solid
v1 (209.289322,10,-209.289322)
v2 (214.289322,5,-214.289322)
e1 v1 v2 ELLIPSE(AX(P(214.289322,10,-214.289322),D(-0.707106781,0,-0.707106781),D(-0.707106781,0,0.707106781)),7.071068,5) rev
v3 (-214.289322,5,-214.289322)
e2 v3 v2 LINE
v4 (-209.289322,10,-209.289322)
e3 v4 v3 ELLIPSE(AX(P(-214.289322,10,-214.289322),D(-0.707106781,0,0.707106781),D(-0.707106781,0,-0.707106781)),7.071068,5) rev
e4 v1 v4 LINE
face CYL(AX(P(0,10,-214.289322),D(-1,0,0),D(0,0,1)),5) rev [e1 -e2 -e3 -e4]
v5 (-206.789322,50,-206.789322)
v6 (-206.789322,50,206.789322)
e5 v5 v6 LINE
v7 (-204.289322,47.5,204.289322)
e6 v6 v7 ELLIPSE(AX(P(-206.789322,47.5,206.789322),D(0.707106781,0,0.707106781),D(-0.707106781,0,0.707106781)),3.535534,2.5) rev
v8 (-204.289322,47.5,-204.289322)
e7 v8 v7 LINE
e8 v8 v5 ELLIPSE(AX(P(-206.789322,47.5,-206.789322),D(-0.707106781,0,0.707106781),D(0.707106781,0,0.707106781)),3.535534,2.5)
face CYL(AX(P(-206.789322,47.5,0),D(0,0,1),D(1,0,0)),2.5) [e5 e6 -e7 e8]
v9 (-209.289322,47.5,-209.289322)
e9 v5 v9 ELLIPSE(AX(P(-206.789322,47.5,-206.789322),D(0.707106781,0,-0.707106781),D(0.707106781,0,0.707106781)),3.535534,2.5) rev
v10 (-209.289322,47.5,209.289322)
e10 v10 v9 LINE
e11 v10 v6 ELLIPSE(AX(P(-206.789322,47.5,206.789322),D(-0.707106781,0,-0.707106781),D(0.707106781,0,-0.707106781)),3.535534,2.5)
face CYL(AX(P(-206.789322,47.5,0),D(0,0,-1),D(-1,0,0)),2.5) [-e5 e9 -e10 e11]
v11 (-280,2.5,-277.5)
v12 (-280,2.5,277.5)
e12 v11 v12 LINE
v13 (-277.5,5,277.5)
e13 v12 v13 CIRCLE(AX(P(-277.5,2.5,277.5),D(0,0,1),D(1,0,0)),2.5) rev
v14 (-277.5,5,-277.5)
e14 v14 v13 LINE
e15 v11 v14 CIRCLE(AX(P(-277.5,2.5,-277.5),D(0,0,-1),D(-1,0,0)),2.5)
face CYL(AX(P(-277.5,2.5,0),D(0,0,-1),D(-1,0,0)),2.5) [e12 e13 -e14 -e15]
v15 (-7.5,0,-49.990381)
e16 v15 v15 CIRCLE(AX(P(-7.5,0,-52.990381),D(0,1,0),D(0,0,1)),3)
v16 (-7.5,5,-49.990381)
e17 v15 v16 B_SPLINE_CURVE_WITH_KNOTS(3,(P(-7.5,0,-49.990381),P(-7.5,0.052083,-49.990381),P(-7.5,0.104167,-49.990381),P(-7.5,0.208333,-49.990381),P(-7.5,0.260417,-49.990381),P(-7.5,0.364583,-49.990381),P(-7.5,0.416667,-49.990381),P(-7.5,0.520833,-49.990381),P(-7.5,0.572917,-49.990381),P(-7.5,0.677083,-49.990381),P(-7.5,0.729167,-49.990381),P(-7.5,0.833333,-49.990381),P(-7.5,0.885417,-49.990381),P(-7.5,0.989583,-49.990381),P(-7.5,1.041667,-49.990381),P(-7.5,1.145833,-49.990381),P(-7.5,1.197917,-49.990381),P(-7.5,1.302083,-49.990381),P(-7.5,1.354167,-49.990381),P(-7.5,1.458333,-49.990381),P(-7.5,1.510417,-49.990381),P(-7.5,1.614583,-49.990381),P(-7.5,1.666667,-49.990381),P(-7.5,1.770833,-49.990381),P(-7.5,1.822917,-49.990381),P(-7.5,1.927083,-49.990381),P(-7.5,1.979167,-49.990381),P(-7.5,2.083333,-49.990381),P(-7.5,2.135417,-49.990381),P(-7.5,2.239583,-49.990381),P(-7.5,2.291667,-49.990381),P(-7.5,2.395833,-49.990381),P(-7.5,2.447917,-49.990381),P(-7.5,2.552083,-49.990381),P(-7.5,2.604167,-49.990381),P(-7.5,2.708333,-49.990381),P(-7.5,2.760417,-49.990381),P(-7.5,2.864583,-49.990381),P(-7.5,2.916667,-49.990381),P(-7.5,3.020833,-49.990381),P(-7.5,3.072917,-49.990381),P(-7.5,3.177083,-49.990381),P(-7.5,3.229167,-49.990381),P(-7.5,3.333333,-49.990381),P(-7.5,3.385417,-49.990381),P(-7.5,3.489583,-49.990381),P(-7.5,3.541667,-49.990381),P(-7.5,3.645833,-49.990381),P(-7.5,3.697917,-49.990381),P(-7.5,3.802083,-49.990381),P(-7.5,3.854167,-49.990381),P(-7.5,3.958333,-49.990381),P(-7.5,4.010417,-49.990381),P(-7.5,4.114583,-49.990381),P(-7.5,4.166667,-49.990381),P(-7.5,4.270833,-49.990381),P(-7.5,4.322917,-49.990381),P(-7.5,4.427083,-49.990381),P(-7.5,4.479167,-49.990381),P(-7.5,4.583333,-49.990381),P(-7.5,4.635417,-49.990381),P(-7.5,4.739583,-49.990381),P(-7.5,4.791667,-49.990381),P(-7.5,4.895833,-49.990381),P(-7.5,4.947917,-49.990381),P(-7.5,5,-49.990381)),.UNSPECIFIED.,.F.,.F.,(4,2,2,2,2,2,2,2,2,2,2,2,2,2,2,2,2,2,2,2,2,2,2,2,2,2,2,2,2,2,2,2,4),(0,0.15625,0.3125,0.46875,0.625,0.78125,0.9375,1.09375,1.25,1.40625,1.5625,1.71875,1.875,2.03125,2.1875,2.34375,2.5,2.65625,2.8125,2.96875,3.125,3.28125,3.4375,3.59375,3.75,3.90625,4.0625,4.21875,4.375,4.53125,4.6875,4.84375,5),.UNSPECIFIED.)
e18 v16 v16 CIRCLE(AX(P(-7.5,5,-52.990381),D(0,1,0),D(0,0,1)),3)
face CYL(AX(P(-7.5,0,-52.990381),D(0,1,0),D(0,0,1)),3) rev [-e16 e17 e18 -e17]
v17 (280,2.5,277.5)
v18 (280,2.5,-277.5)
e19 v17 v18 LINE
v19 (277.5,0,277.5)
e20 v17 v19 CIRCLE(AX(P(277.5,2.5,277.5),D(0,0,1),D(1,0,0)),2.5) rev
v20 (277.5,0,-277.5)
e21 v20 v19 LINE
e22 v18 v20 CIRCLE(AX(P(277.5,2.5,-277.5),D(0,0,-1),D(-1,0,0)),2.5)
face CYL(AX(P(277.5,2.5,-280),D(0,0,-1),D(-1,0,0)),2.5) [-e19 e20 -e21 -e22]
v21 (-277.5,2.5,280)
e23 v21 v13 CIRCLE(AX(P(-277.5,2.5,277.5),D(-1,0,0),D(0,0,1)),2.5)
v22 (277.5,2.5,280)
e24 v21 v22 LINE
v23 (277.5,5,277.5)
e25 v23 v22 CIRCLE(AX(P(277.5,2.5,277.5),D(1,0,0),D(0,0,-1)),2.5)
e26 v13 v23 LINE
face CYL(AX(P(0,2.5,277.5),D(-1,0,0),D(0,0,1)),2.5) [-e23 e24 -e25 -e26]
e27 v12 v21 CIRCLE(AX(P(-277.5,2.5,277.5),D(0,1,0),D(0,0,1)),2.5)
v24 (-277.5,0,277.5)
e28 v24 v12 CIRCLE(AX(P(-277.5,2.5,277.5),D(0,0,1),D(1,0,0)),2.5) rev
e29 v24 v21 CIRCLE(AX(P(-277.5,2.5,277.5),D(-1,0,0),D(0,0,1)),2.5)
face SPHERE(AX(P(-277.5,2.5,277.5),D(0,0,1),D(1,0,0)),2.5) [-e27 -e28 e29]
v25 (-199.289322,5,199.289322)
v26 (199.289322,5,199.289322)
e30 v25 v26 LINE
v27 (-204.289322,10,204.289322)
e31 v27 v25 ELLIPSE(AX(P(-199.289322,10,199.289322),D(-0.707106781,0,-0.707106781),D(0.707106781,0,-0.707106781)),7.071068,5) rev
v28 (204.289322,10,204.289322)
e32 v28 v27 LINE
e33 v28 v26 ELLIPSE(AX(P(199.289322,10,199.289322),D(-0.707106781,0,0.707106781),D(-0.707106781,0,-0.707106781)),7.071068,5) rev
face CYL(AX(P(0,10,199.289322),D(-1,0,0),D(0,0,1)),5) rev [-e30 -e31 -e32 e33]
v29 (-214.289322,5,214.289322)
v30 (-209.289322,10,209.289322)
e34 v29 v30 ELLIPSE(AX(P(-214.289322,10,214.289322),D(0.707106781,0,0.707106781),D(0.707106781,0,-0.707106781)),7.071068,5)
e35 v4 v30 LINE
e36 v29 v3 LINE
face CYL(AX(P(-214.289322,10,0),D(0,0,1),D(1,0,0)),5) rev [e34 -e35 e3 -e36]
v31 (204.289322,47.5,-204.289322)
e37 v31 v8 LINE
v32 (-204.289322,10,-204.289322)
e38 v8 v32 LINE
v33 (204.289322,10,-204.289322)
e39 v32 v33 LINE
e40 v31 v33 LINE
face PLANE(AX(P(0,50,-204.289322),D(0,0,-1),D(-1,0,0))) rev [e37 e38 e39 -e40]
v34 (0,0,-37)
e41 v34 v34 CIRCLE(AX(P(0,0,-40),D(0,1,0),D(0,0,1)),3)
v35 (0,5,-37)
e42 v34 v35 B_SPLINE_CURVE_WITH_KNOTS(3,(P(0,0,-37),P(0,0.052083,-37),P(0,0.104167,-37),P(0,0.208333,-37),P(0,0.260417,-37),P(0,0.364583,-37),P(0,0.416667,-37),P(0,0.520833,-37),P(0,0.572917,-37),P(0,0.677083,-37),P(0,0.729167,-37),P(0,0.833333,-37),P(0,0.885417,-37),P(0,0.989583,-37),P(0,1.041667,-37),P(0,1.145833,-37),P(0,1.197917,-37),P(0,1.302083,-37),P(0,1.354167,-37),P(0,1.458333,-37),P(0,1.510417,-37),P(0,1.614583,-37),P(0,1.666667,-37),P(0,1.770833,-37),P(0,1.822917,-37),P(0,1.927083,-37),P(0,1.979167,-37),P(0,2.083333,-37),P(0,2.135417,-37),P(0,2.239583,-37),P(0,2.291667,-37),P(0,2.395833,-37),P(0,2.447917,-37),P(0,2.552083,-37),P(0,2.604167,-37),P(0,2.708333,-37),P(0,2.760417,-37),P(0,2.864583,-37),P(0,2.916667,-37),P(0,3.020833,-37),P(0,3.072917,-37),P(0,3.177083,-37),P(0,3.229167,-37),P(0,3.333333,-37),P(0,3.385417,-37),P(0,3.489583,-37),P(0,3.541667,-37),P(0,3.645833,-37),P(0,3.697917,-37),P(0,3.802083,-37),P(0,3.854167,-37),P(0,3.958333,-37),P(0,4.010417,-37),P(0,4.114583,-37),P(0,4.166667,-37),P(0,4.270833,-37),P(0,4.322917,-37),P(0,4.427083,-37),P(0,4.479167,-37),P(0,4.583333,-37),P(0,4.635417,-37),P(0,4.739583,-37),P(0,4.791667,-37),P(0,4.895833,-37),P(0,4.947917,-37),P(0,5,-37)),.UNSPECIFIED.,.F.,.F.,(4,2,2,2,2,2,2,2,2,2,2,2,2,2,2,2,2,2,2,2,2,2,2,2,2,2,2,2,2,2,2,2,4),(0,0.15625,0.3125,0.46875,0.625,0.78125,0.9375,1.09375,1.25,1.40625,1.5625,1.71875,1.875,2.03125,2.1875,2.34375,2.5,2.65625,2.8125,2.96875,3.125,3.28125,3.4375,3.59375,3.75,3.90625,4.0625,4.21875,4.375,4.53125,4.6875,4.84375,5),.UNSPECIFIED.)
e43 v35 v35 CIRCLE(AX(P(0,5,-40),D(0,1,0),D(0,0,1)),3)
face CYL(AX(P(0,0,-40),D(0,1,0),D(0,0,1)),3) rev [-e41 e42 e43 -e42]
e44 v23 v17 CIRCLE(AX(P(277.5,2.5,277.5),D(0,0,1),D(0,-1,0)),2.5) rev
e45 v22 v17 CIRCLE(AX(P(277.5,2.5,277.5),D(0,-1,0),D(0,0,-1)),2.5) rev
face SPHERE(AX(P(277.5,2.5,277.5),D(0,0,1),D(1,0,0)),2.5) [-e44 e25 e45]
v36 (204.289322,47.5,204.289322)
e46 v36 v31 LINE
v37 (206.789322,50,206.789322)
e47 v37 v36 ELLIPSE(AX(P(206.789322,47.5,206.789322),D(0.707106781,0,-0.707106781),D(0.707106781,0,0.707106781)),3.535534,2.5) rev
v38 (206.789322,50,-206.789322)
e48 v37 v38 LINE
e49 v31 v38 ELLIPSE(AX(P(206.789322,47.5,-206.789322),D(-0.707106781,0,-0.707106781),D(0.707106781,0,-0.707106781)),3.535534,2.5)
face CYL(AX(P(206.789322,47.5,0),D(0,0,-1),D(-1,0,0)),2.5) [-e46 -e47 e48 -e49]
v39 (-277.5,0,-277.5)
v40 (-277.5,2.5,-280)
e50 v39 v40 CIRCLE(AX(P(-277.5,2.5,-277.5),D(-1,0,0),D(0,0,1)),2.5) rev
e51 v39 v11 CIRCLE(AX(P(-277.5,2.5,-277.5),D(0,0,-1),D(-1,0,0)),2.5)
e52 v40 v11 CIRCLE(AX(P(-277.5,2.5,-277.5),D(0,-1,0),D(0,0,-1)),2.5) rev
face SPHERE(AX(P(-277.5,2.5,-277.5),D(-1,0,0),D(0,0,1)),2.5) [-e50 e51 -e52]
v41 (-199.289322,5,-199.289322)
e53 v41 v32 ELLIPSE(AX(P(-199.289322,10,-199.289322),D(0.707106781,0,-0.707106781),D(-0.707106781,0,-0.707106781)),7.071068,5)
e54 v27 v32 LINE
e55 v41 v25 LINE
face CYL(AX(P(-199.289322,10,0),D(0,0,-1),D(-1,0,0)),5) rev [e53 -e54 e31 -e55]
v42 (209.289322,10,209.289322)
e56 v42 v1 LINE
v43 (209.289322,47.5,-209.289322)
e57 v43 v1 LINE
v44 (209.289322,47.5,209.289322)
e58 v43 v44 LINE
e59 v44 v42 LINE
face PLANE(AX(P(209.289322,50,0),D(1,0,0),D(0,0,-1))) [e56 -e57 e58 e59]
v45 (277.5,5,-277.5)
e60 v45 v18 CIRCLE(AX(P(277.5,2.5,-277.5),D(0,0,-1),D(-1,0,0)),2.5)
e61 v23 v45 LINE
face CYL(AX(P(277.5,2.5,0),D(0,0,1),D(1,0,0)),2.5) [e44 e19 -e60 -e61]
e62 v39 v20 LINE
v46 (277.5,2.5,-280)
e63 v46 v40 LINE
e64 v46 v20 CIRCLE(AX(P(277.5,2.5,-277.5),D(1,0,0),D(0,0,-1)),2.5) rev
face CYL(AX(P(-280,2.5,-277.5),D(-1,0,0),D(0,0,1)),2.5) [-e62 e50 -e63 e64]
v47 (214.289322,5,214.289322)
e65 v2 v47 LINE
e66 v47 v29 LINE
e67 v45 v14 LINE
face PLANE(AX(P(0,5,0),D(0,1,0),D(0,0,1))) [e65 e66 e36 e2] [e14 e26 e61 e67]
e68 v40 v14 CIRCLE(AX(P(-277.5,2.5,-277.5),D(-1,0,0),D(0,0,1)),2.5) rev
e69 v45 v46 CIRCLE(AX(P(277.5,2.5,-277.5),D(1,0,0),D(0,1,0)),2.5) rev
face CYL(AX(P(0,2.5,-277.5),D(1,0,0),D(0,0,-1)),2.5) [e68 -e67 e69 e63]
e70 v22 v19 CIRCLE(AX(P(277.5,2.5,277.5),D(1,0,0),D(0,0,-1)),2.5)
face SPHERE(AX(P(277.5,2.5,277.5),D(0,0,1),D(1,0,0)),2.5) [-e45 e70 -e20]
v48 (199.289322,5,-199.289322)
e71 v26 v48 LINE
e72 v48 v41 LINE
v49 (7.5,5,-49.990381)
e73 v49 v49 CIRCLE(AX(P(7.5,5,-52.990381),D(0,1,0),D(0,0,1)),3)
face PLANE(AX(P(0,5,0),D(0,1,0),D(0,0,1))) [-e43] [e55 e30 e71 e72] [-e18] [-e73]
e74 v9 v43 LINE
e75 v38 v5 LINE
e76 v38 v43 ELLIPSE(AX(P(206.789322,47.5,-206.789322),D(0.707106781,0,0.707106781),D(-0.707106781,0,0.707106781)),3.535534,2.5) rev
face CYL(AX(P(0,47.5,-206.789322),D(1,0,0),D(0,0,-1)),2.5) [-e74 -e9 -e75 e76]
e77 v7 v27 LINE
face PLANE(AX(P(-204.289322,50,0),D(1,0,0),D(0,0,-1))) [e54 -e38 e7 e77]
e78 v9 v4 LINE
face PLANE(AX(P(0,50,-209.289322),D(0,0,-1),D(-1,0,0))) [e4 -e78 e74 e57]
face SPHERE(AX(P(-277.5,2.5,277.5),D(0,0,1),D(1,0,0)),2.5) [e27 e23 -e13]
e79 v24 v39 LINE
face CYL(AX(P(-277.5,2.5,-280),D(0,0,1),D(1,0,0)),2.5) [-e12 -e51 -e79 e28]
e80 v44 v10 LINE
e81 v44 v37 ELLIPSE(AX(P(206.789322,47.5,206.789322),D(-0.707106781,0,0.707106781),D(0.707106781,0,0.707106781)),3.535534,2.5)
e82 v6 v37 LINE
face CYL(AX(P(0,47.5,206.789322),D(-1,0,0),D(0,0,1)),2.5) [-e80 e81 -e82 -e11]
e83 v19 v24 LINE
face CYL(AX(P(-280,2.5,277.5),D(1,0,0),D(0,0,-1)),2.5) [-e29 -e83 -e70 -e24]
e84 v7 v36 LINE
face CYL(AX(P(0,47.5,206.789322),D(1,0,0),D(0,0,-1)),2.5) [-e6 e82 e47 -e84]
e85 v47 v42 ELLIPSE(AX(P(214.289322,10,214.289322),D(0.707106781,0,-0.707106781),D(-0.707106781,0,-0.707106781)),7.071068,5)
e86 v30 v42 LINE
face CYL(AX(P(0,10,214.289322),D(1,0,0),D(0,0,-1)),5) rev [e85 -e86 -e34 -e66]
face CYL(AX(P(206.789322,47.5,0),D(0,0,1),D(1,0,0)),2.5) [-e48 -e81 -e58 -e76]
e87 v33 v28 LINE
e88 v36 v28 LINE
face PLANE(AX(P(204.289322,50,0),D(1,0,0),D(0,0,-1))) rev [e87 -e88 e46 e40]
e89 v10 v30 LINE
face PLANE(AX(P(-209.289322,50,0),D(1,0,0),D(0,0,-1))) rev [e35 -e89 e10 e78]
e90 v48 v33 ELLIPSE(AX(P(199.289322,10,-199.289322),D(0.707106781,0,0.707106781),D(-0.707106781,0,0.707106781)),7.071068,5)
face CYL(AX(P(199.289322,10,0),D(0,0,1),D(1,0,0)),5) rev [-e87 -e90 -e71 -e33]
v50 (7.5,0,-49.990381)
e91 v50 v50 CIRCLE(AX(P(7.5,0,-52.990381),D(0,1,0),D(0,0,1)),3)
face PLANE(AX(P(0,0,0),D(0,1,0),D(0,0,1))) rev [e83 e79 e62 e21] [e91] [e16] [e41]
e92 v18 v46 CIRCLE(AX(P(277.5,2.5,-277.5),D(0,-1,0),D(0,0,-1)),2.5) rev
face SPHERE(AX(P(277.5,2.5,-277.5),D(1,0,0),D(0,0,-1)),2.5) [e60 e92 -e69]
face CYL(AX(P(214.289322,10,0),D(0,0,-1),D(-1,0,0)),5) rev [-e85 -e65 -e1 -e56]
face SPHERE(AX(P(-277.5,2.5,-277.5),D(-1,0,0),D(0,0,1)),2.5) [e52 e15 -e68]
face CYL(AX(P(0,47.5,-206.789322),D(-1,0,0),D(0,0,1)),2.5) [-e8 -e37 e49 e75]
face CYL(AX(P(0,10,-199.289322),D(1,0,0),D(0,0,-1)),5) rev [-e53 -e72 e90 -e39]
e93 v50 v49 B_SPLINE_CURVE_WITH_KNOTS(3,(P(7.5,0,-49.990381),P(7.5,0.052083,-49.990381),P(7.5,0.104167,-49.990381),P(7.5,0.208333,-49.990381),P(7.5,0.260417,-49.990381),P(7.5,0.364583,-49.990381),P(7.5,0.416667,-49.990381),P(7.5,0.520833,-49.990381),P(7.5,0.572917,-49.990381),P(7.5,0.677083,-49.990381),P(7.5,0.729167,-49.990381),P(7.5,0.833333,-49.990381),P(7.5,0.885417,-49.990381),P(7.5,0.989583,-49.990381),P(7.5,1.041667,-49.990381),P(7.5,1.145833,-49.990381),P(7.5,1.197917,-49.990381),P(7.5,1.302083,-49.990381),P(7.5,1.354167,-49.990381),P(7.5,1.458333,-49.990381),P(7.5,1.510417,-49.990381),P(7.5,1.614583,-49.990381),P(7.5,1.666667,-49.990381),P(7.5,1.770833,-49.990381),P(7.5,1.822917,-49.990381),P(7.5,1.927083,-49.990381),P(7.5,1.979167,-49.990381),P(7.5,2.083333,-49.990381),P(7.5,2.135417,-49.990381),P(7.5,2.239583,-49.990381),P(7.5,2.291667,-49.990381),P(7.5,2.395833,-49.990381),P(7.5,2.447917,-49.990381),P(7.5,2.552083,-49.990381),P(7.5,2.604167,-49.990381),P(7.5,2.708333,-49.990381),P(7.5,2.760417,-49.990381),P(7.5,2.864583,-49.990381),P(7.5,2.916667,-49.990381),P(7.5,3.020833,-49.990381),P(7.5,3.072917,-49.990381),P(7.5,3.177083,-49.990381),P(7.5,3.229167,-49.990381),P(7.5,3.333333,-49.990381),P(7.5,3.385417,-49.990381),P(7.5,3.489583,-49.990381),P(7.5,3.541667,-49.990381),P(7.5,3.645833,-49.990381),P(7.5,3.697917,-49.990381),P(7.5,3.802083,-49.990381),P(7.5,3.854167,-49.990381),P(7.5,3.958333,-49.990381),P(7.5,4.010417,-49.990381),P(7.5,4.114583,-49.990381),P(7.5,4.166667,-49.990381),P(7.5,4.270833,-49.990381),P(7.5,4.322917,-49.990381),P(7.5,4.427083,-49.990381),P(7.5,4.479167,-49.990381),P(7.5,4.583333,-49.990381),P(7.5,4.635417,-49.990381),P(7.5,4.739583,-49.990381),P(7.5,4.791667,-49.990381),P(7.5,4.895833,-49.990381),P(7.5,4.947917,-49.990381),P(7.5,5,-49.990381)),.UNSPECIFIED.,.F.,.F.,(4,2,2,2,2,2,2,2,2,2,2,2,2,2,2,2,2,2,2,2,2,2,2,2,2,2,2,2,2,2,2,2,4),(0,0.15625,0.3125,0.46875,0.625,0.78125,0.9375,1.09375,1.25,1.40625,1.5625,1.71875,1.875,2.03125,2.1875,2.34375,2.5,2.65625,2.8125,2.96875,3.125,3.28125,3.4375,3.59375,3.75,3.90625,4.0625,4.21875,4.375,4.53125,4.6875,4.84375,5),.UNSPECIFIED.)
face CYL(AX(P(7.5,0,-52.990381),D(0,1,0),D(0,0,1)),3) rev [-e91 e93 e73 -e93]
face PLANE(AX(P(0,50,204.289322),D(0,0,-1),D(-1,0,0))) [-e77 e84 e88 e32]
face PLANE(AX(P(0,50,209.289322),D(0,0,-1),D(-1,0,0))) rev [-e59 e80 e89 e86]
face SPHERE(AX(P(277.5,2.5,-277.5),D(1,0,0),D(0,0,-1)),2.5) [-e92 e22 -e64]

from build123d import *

# Parameters (mm, degrees)
SKETCH1_W           = 560
SKETCH1_H           = 560
BOSS_EXTRUDE1_DEPTH = 5
SKETCH2_W           = 418.578643762
SKETCH2_H           = 418.578643762
SKETCH2_W_2         = 408.578643762
SKETCH2_H_2         = 408.578643762
BOSS_EXTRUDE2_DEPTH = 45
SKETCH3_R           = 3
CUT_EXTRUDE1_DEPTH  = 5
FILLET1_R           = 5
FILLET2_R           = 2.5
FILLET3_R           = 2.5


with BuildPart() as part:
    # Sketch1 → Boss-Extrude1 (new body)
    with BuildSketch(Plane(origin=(0, 0, 0), x_dir=(1, 0, 0), z_dir=(0, 1, 0))):
        Rectangle(SKETCH1_W, SKETCH1_H)
    extrude(amount=BOSS_EXTRUDE1_DEPTH)

    # Sketch2 → Boss-Extrude2 (add)
    with BuildSketch(Plane(origin=(0, 5, 0), x_dir=(1, 0, 0), z_dir=(0, 1, 0))):
        Rectangle(SKETCH2_W, SKETCH2_H)
        Rectangle(SKETCH2_W_2, SKETCH2_H_2, mode=Mode.SUBTRACT)
    extrude(amount=BOSS_EXTRUDE2_DEPTH)

    # Sketch3 → Cut-Extrude1 (cut)
    with BuildSketch(Plane(origin=(0, 5, 0), x_dir=(1, 0, 0), z_dir=(0, 1, 0))):
        with Locations(Location((7.5, 52.990381057, 0), (0, 0, 270))):
            Circle(SKETCH3_R)
        with Locations(Location((0, 40, 0), (0, 0, 270))):
            Circle(SKETCH3_R)
        with Locations(Location((-7.5, 52.990381057, 0), (0, 0, 270))):
            Circle(SKETCH3_R)
    extrude(amount=-CUT_EXTRUDE1_DEPTH, mode=Mode.SUBTRACT)

    # Fillet1
    fillet1_edges = [part.edges().sort_by_distance(p)[0] for p in [
        (0, 5, -204.289321881),
        (204.289321881, 5, 0),
        (-209.289321881, 5, 0),
        (0, 5, 209.289321881),
        (209.289321881, 5, 0),
        (0, 5, -209.289321881),
        (-204.289321881, 5, 0),
        (0, 5, 204.289321881),
    ]]
    fillet(fillet1_edges, radius=FILLET1_R)

    # Fillet2
    fillet2_edges = [part.edges().sort_by_distance(p)[0] for p in [
        (0, 50, 204.289321881),
        (209.289321881, 50, 0),
        (0, 50, -209.289321881),
        (-204.289321881, 50, 0),
        (-209.289321881, 50, 0),
        (0, 50, 209.289321881),
        (0, 50, -204.289321881),
        (204.289321881, 50, 0),
    ]]
    fillet(fillet2_edges, radius=FILLET2_R - 0.0001)  # a hair under: the kernel refuses the full size

    # Fillet3
    fillet3_edges = [part.edges().sort_by_distance(p)[0] for p in [
        (-280, 5, 0),
        (0, 5, 280),
        (280, 5, 0),
        (0, 0, 280),
        (-280, 0, 0),
        (0, 0, -280),
        (280, 0, 0),
        (280, 2.5, 280),
        (-280, 2.5, 280),
        (-280, 2.5, -280),
        (280, 2.5, -280),
        (0, 5, -280),
    ]]
    fillet(fillet3_edges, radius=FILLET3_R - 0.0001)  # a hair under: the kernel refuses the full size


solid = part.part
